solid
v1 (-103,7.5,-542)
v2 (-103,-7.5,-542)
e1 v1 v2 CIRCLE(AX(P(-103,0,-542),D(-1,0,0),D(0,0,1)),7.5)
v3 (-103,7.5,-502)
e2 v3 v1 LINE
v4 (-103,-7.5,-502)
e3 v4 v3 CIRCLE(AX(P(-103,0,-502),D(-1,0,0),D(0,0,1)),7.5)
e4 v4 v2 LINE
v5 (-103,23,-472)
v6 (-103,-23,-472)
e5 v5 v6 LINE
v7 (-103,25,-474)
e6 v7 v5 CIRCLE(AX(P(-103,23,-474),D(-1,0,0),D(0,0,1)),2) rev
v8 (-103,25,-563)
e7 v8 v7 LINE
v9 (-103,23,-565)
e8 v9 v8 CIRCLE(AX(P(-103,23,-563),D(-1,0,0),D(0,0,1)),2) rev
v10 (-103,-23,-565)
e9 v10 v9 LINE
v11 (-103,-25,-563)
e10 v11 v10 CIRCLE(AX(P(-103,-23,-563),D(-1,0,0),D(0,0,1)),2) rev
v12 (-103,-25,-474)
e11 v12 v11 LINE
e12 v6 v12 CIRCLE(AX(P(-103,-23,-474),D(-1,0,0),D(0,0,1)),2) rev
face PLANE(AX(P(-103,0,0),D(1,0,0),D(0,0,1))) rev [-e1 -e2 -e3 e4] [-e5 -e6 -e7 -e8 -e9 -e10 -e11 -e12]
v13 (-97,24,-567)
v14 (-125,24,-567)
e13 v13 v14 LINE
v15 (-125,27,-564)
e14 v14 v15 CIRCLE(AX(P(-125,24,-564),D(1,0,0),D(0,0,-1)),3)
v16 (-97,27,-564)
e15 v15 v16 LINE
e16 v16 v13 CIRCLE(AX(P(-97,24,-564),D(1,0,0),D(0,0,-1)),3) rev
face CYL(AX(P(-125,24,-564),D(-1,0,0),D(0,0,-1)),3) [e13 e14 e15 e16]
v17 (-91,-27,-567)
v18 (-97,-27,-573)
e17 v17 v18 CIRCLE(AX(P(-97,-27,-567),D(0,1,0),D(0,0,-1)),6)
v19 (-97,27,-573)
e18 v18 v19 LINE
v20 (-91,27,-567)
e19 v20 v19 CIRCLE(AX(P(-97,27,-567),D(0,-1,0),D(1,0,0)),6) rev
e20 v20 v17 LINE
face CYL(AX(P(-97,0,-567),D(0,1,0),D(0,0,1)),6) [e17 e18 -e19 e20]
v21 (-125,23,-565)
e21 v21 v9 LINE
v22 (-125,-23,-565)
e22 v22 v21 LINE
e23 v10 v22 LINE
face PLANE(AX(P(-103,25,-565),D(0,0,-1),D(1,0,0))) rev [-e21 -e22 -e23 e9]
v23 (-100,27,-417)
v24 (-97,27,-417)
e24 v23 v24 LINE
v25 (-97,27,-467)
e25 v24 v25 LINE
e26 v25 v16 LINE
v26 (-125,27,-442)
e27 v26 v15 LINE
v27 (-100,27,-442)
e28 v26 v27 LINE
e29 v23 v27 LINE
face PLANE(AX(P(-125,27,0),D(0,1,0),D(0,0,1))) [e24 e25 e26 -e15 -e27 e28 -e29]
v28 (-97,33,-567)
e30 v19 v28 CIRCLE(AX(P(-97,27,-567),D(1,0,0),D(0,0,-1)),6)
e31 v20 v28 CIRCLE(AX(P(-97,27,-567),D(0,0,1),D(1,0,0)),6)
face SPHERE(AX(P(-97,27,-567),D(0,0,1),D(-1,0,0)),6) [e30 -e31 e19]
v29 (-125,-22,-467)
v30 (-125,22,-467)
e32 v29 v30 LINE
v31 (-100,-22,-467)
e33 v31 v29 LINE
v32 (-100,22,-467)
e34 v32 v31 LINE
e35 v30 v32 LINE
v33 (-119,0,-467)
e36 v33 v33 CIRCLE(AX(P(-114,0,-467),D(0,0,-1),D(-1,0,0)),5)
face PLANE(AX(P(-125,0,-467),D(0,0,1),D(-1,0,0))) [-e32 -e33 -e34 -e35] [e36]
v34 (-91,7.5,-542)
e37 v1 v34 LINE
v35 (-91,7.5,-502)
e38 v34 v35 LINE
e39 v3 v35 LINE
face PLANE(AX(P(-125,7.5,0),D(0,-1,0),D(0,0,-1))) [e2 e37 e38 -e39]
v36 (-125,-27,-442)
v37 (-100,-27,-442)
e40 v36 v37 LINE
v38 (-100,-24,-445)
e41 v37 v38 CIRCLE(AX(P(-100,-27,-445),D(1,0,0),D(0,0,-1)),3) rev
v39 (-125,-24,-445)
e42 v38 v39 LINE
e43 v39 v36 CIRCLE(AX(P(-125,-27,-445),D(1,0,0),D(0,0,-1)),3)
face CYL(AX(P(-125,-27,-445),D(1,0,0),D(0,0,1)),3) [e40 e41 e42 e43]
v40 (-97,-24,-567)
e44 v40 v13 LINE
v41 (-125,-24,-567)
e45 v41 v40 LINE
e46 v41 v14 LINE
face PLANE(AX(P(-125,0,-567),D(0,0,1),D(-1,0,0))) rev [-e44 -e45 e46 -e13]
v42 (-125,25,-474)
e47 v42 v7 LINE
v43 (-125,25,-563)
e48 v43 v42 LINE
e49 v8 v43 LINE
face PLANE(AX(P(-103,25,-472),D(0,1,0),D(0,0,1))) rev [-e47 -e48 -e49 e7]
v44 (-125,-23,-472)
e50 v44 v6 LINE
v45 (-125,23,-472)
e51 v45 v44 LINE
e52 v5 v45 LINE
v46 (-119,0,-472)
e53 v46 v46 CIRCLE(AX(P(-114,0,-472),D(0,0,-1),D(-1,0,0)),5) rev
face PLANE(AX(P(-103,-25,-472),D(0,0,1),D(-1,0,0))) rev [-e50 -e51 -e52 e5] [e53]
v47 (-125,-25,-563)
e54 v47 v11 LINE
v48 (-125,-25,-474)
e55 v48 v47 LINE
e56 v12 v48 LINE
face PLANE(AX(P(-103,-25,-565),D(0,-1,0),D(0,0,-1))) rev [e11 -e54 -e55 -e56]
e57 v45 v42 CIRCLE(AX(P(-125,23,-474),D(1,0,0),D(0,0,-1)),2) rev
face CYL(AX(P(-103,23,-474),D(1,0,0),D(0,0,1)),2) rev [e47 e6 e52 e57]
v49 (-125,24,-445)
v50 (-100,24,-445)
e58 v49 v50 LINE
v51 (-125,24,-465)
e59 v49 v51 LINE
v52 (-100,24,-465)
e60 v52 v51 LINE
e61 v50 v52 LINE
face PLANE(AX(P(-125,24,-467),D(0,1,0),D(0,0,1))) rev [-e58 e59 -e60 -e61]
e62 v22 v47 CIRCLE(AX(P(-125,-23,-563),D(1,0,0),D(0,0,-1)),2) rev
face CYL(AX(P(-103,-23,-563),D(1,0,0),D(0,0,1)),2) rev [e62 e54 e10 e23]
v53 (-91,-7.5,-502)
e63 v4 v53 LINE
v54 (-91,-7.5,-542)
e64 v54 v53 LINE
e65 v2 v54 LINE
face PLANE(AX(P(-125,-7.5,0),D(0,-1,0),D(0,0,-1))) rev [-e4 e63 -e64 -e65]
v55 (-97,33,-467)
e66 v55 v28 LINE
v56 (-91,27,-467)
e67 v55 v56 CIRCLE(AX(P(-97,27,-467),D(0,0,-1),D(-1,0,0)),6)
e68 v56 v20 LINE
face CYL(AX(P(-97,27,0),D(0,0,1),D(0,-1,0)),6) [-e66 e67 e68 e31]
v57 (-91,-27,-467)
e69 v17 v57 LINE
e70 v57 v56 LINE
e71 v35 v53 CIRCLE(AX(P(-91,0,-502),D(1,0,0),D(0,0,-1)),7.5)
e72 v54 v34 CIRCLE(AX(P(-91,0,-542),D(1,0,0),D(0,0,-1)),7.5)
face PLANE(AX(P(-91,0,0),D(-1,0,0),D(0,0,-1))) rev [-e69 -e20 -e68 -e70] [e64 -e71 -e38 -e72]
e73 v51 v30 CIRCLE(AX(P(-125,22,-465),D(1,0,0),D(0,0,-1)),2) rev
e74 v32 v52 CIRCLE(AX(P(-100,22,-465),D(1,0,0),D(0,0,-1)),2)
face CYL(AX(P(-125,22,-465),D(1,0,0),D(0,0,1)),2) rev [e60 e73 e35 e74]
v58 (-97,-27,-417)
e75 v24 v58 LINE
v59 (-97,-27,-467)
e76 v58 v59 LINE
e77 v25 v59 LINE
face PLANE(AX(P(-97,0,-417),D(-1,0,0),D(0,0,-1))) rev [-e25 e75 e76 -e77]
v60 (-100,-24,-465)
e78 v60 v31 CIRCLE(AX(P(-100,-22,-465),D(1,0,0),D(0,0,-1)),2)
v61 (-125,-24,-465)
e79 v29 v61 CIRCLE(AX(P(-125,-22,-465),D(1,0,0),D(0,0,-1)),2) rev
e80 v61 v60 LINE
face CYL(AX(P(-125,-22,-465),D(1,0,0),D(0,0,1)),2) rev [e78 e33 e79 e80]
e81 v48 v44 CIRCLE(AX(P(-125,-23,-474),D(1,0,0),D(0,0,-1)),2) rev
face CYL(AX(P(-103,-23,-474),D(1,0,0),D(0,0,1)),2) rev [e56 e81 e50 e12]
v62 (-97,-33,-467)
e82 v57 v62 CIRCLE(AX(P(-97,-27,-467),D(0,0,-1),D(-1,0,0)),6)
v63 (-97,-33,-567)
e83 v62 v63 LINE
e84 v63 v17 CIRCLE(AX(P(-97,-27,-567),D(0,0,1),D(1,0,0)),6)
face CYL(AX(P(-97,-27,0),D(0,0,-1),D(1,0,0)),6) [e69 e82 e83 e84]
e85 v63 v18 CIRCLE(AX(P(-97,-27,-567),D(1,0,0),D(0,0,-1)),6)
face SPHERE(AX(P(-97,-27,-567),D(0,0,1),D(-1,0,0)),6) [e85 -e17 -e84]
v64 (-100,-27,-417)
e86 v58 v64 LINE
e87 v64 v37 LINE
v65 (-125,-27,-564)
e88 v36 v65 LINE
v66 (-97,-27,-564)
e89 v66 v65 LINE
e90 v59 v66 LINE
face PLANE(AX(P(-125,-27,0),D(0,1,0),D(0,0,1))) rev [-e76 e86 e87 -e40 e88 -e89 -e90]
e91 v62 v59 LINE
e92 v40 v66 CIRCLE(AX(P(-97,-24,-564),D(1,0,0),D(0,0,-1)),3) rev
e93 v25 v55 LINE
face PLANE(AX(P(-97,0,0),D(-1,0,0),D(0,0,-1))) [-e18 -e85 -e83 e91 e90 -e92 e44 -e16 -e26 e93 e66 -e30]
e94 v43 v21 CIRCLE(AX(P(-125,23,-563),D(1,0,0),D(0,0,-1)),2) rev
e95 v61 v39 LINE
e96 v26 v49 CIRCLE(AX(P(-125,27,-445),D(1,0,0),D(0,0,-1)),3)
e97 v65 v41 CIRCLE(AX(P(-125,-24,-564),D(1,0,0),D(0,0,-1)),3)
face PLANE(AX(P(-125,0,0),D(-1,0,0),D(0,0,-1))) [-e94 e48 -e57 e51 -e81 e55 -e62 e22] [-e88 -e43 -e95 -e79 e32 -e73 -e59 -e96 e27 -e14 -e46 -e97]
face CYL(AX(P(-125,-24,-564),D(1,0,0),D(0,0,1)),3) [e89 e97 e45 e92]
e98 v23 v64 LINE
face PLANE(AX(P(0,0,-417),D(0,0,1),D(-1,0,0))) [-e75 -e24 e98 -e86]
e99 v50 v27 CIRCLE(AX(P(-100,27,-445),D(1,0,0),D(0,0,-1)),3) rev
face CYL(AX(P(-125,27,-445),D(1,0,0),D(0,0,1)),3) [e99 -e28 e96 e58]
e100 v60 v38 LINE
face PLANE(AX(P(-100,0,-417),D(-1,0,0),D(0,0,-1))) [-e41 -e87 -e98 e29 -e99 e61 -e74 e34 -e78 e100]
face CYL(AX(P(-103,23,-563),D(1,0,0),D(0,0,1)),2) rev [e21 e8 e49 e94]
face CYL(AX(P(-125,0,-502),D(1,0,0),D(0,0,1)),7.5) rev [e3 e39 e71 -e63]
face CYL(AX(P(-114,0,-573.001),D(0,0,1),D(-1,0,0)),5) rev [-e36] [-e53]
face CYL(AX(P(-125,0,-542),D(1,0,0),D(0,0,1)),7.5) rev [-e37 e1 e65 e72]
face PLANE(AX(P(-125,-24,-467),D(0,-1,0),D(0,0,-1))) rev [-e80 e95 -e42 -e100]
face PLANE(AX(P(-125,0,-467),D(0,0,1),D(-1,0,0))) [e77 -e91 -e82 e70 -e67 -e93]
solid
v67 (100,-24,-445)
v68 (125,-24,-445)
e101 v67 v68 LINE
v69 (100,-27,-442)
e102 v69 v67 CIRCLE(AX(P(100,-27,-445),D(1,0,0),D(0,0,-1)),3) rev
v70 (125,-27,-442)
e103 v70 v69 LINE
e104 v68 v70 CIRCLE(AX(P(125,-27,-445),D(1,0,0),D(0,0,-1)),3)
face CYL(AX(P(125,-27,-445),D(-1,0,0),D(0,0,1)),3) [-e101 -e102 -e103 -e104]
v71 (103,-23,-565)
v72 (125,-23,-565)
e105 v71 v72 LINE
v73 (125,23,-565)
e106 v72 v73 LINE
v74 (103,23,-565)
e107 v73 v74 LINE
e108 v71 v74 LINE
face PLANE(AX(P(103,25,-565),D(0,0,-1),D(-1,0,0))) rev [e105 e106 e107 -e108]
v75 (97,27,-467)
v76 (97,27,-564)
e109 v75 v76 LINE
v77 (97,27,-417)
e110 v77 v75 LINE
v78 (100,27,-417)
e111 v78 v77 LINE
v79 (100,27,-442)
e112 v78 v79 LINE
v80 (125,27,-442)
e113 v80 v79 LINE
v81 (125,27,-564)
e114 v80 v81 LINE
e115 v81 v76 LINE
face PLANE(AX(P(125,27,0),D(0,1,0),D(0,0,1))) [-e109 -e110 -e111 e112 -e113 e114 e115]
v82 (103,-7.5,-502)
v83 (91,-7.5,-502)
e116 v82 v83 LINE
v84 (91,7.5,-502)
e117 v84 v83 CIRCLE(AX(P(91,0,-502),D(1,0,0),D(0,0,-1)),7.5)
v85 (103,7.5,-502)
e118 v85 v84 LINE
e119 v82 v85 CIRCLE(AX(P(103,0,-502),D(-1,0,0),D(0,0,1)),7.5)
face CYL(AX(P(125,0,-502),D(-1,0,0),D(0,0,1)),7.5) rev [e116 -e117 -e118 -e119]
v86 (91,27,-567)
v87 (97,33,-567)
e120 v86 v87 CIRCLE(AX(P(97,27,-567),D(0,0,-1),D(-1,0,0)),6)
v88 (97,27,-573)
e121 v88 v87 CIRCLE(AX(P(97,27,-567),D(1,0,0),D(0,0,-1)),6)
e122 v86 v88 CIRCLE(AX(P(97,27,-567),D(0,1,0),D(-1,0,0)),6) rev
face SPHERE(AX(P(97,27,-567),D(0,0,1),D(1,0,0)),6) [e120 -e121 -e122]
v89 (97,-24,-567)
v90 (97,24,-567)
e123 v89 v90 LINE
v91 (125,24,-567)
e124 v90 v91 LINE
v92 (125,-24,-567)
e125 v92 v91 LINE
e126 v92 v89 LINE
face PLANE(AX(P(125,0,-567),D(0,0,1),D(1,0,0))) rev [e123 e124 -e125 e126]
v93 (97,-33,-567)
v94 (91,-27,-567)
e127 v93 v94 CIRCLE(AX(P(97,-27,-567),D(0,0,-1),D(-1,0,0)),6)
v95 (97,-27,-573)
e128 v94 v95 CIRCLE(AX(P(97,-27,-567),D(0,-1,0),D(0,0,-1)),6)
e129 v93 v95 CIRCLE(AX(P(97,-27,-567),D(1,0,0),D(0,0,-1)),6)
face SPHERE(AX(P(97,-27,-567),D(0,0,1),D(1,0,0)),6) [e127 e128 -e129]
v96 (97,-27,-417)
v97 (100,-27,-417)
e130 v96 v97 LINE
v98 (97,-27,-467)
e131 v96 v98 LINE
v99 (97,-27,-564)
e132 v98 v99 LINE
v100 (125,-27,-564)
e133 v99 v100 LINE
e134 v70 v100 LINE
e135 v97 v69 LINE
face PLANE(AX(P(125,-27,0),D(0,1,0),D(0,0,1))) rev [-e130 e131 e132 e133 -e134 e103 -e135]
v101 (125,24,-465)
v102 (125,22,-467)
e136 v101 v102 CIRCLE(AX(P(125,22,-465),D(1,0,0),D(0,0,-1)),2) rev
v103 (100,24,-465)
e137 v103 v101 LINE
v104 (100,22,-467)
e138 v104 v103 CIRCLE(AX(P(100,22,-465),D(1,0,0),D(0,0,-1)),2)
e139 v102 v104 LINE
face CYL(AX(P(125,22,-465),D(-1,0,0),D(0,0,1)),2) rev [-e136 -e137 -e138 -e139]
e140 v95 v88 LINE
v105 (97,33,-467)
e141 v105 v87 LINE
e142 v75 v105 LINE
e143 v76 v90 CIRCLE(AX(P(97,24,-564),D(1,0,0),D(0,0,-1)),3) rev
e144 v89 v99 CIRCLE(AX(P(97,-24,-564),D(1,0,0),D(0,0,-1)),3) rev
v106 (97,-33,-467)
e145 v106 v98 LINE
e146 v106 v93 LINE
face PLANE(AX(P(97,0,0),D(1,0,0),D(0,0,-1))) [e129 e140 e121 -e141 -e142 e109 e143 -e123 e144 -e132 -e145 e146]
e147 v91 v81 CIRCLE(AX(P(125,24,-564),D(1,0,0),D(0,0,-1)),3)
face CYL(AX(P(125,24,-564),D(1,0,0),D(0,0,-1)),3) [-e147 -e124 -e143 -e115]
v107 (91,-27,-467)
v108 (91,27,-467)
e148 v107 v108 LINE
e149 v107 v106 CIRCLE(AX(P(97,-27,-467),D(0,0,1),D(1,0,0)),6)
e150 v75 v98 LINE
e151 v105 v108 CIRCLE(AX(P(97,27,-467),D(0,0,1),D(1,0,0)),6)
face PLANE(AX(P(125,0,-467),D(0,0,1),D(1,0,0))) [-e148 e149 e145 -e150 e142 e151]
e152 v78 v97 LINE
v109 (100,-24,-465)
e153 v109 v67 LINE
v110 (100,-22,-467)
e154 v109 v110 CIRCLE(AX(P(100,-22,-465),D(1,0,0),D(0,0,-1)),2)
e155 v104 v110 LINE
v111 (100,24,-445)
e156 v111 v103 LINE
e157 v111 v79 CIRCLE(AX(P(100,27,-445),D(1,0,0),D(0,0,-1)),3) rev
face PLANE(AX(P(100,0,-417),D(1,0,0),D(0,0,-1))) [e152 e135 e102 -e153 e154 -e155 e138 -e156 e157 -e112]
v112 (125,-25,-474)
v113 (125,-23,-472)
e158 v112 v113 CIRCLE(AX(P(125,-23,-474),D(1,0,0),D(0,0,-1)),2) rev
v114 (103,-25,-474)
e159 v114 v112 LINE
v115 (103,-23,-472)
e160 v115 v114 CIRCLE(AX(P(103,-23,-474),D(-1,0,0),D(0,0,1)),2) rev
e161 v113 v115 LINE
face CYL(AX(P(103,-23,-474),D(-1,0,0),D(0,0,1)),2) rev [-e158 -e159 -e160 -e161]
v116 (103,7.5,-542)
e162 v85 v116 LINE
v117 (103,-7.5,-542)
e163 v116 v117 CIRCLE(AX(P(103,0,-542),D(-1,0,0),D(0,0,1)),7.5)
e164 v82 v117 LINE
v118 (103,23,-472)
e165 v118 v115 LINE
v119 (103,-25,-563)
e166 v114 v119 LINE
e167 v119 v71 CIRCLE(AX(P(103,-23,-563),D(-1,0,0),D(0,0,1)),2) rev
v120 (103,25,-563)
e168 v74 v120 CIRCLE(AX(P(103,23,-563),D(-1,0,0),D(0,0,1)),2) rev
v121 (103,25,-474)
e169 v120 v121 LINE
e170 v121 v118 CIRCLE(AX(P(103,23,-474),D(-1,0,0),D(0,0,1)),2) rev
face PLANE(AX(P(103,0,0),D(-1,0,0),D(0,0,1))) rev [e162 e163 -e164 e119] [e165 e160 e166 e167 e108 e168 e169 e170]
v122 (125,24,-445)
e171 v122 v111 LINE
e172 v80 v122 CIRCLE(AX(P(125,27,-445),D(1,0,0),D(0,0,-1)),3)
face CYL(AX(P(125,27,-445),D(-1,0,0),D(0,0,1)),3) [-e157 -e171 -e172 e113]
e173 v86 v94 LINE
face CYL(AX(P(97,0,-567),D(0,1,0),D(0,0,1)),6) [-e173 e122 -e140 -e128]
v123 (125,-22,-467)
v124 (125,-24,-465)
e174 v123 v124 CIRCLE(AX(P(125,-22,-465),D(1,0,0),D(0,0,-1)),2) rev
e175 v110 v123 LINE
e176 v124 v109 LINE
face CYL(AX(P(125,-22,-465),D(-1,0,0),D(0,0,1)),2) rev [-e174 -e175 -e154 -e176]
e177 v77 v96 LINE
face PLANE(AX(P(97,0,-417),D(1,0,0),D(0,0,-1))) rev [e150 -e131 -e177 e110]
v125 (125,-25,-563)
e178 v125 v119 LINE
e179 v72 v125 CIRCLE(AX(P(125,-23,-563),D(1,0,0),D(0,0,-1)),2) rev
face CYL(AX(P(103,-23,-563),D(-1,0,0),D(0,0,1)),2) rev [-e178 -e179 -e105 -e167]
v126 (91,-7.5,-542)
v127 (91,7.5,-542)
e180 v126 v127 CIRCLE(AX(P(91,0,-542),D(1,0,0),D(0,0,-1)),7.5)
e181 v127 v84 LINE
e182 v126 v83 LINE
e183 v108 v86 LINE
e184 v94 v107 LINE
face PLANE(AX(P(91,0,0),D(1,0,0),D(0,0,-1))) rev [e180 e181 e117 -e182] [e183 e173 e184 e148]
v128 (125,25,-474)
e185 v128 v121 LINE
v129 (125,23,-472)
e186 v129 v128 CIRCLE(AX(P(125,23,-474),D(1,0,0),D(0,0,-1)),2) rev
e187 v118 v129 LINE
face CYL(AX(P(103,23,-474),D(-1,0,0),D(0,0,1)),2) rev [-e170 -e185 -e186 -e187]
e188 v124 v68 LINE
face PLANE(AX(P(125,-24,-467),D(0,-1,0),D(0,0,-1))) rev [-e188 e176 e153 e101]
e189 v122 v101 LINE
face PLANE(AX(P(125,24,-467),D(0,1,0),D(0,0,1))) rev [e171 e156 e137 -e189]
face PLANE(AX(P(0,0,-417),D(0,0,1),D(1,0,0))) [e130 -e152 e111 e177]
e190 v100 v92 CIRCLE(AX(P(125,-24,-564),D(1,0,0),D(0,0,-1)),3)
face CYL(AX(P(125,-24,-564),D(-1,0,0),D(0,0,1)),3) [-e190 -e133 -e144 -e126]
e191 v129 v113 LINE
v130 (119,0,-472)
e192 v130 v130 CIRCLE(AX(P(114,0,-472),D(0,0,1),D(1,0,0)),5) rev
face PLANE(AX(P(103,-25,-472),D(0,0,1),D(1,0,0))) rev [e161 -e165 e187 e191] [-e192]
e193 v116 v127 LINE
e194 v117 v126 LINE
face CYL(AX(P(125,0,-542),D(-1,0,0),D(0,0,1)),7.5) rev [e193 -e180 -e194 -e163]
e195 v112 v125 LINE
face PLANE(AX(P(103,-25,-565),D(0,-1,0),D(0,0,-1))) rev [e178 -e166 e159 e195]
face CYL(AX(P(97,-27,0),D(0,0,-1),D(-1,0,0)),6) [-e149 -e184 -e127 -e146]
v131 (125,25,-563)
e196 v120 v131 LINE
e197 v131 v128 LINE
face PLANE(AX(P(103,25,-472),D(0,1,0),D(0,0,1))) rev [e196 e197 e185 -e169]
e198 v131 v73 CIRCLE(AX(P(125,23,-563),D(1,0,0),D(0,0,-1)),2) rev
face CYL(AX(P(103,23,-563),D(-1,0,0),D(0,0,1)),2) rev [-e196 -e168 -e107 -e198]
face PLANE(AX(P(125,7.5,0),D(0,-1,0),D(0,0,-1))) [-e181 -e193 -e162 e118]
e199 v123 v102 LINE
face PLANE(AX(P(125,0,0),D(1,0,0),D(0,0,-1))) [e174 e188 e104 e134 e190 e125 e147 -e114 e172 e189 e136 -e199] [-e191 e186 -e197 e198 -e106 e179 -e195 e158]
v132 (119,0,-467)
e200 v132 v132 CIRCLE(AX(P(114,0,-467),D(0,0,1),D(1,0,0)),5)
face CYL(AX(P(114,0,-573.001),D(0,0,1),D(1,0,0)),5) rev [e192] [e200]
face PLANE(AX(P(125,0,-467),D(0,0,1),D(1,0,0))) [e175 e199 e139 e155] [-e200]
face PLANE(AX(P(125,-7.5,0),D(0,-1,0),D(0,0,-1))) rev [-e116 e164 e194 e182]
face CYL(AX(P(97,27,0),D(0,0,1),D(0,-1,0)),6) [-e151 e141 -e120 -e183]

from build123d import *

# Parameters (mm, degrees)
DODANIE_WYCI_GNI_CIE1_START = 91
SZKIC12_W                   = 100
SZKIC12_H                   = 54
DODANIE_WYCI_GNI_CIE1_DEPTH = 34
DODANIE_WYCI_GNI_CIE4_START = 91
DODANIE_WYCI_GNI_CIE4_DEPTH = 6
SZKIC15_W                   = 93
SZKIC15_H                   = 50
WYTNIJ_WYCI_GNI_CIE1_DEPTH  = 22
WYTNIJ_WYCI_GNI_CIE2_REACH  = 169.183
SZKIC16_R                   = 5
SZKIC16_3_W                 = 3
SZKIC16_3_H                 = 54
DODANIE_WYCI_GNI_CIE2_DEPTH = 50
SZKIC18_W                   = 25
SZKIC18_H                   = 3
DODANIE_WYCI_GNI_CIE3_DEPTH = 25
ZAOKR_GLENIE9_R             = 3
ZAOKR_GLENIE8_R             = 2
ZAOKR_GLENIE10_R            = 6


# Some blends are built 0.0001 mm under size
with BuildPart() as part:
    # Szkic12 → Dodanie-wyciągnięcie1 (new body)
    with BuildSketch(Plane(origin=(0, 0, 0), x_dir=(0, 0, -1), z_dir=(1, 0, 0)).offset(DODANIE_WYCI_GNI_CIE1_START)):
        with Locations((517, 0)):
            Rectangle(SZKIC12_W, SZKIC12_H)
        with BuildLine():
            Line((502, 7.5), (542, 7.5))
            ThreePointArc((542, 7.5), (549.5, 0), (542, -7.5))
            Line((542, -7.5), (502, -7.5))
            ThreePointArc((502, -7.5), (494.5, 0), (502, 7.5))
        make_face(mode=Mode.SUBTRACT)
    extrude(amount=DODANIE_WYCI_GNI_CIE1_DEPTH)

    # Szkic12<4> → Dodanie-wyciągnięcie4 (add)
    with BuildSketch(Plane(origin=(0, 0, 0), x_dir=(0, 0, -1), z_dir=(1, 0, 0)).offset(DODANIE_WYCI_GNI_CIE4_START)):
        Polygon((467, -27), (467, -33), (573, -33), (573, 33), (467, 33), (467, 27), (567, 27), (567, -27), align=None)
    extrude(amount=DODANIE_WYCI_GNI_CIE4_DEPTH)

    # Szkic15 → Wytnij-wyciągnięcie1 (cut)
    with BuildSketch(Plane(origin=(125, 0, 0), x_dir=(0, 0, -1), z_dir=(1, 0, 0))):
        with Locations((518.5, 0)):
            Rectangle(SZKIC15_W, SZKIC15_H)
    extrude(amount=-WYTNIJ_WYCI_GNI_CIE1_DEPTH, mode=Mode.SUBTRACT)

    # Szkic16 → Wytnij-wyciągnięcie2 (cut, up to next)
    with BuildSketch(Plane.XY.offset(-467), mode=Mode.PRIVATE) as wytnij_wyci_gni_cie2_sk1:
        with Locations((114, 0)):
            Circle(SZKIC16_R)
    wytnij_wyci_gni_cie2_tool1 = extrude(wytnij_wyci_gni_cie2_sk1.sketch, amount=-WYTNIJ_WYCI_GNI_CIE2_REACH, mode=Mode.PRIVATE) & part.part
    add(wytnij_wyci_gni_cie2_tool1.solids().sort_by_distance((114, 0, -467))[0], mode=Mode.SUBTRACT)

    # Szkic16<3> → Dodanie-wyciągnięcie2 (add)
    with BuildSketch(Plane.XY.offset(-467)):
        with Locations((98.5, 0)):
            Rectangle(SZKIC16_3_W, SZKIC16_3_H)
    extrude(amount=DODANIE_WYCI_GNI_CIE2_DEPTH)

    # Szkic18 → Dodanie-wyciągnięcie3 (add)
    with BuildSketch(Plane(origin=(100, 0, 0), x_dir=(0, 0, -1), z_dir=(1, 0, 0))):
        with Locations((454.5, -25.5)):
            Rectangle(SZKIC18_W, SZKIC18_H)
        with Locations((454.5, 25.5)):
            Rectangle(SZKIC18_W, SZKIC18_H)
    extrude(amount=DODANIE_WYCI_GNI_CIE3_DEPTH)

    # Zaokrąglenie9
    zaokr_glenie9_edges = [part.edges().sort_by_distance(p)[0] for p in [
        (111, -27, -567),
        (111, 27, -567),
        (112.5, -24, -442),
        (112.5, 24, -442),
    ]]
    fillet(zaokr_glenie9_edges, radius=ZAOKR_GLENIE9_R - 0.0001)  # a hair under: the kernel refuses the full size

    # Zaokrąglenie8
    zaokr_glenie8_edges = [part.edges().sort_by_distance(p)[0] for p in [
        (112.5, -24, -467),
        (114, -25, -472),
        (114, 25, -472),
        (114, 25, -565),
        (114, -25, -565),
        (112.5, 24, -467),
    ]]
    fillet(zaokr_glenie8_edges, radius=ZAOKR_GLENIE8_R)

    # Zaokrąglenie10
    # the kernel refuses this fillet: 6 mm, written as the material it takes off along each edge
    with BuildSketch(Plane(origin=(97, 27, -567), x_dir=(0, 1, 0), z_dir=(-1, 0, 0))) as zaokr_glenie10_piece_1_section:
        Polygon((0, 0), (ZAOKR_GLENIE10_R * 1.02, 0), (ZAOKR_GLENIE10_R * 1.02, ZAOKR_GLENIE10_R * 1.02), (0, ZAOKR_GLENIE10_R * 1.02), align=None)
    zaokr_glenie10_piece_1 = extrude(amount=ZAOKR_GLENIE10_R * 1.02, mode=Mode.PRIVATE)
    zaokr_glenie10_piece_1 = zaokr_glenie10_piece_1 - Plane(origin=(97, 27, -567), x_dir=(0, -0.7071067811865475, 0.7071067811865477), z_dir=(-1, 0, 0)) * Sphere(ZAOKR_GLENIE10_R, mode=Mode.PRIVATE)
    add(zaokr_glenie10_piece_1, mode=Mode.SUBTRACT)
    with BuildSketch(Plane(origin=(97, -27, -567), x_dir=(0, 0, -1), z_dir=(-1, 0, 0))) as zaokr_glenie10_piece_2_section:
        Polygon((0, 0), (ZAOKR_GLENIE10_R * 1.02, 0), (ZAOKR_GLENIE10_R * 1.02, ZAOKR_GLENIE10_R * 1.02), (0, ZAOKR_GLENIE10_R * 1.02), align=None)
    zaokr_glenie10_piece_2 = extrude(amount=ZAOKR_GLENIE10_R * 1.02, mode=Mode.PRIVATE)
    zaokr_glenie10_piece_2 = zaokr_glenie10_piece_2 - Plane(origin=(97, -27, -567), x_dir=(0, 0.7071067811865475, 0.7071067811865475), z_dir=(-1, 0, 0)) * Sphere(ZAOKR_GLENIE10_R, mode=Mode.PRIVATE)
    add(zaokr_glenie10_piece_2, mode=Mode.SUBTRACT)
    with BuildSketch(Plane(origin=(91, -33, -452), x_dir=(1, 0, 0), z_dir=(0, 0, -1)), Plane(origin=(91, 33, -567), x_dir=(1, 0, 0), z_dir=(0, 0, 1))) as zaokr_glenie10_piece_3:
        with BuildLine():
            CenterArc((ZAOKR_GLENIE10_R, -ZAOKR_GLENIE10_R), ZAOKR_GLENIE10_R, 90, 90)
            Line((0, -ZAOKR_GLENIE10_R), (0, 0))
            Line((0, 0), (ZAOKR_GLENIE10_R, 0))
        make_face()
    extrude(amount=115, mode=Mode.SUBTRACT)
    with BuildSketch(Plane(origin=(91, -27, -573), x_dir=(1, 0, 0), z_dir=(0, 1, 0))) as zaokr_glenie10_piece_4:
        with BuildLine():
            CenterArc((ZAOKR_GLENIE10_R, -ZAOKR_GLENIE10_R), ZAOKR_GLENIE10_R, 90, 90)
            Line((0, -ZAOKR_GLENIE10_R), (0, 0))
            Line((0, 0), (ZAOKR_GLENIE10_R, 0))
        make_face()
    extrude(amount=54, mode=Mode.SUBTRACT)


with BuildPart() as body_2:
    # Lustro5: mirrored copy
    add(part.part.mirror(Plane(origin=(0, 0, 0), x_dir=(0, 0, 1), z_dir=(1, 0, 0))))


solid = Compound([part.part, body_2.part])
